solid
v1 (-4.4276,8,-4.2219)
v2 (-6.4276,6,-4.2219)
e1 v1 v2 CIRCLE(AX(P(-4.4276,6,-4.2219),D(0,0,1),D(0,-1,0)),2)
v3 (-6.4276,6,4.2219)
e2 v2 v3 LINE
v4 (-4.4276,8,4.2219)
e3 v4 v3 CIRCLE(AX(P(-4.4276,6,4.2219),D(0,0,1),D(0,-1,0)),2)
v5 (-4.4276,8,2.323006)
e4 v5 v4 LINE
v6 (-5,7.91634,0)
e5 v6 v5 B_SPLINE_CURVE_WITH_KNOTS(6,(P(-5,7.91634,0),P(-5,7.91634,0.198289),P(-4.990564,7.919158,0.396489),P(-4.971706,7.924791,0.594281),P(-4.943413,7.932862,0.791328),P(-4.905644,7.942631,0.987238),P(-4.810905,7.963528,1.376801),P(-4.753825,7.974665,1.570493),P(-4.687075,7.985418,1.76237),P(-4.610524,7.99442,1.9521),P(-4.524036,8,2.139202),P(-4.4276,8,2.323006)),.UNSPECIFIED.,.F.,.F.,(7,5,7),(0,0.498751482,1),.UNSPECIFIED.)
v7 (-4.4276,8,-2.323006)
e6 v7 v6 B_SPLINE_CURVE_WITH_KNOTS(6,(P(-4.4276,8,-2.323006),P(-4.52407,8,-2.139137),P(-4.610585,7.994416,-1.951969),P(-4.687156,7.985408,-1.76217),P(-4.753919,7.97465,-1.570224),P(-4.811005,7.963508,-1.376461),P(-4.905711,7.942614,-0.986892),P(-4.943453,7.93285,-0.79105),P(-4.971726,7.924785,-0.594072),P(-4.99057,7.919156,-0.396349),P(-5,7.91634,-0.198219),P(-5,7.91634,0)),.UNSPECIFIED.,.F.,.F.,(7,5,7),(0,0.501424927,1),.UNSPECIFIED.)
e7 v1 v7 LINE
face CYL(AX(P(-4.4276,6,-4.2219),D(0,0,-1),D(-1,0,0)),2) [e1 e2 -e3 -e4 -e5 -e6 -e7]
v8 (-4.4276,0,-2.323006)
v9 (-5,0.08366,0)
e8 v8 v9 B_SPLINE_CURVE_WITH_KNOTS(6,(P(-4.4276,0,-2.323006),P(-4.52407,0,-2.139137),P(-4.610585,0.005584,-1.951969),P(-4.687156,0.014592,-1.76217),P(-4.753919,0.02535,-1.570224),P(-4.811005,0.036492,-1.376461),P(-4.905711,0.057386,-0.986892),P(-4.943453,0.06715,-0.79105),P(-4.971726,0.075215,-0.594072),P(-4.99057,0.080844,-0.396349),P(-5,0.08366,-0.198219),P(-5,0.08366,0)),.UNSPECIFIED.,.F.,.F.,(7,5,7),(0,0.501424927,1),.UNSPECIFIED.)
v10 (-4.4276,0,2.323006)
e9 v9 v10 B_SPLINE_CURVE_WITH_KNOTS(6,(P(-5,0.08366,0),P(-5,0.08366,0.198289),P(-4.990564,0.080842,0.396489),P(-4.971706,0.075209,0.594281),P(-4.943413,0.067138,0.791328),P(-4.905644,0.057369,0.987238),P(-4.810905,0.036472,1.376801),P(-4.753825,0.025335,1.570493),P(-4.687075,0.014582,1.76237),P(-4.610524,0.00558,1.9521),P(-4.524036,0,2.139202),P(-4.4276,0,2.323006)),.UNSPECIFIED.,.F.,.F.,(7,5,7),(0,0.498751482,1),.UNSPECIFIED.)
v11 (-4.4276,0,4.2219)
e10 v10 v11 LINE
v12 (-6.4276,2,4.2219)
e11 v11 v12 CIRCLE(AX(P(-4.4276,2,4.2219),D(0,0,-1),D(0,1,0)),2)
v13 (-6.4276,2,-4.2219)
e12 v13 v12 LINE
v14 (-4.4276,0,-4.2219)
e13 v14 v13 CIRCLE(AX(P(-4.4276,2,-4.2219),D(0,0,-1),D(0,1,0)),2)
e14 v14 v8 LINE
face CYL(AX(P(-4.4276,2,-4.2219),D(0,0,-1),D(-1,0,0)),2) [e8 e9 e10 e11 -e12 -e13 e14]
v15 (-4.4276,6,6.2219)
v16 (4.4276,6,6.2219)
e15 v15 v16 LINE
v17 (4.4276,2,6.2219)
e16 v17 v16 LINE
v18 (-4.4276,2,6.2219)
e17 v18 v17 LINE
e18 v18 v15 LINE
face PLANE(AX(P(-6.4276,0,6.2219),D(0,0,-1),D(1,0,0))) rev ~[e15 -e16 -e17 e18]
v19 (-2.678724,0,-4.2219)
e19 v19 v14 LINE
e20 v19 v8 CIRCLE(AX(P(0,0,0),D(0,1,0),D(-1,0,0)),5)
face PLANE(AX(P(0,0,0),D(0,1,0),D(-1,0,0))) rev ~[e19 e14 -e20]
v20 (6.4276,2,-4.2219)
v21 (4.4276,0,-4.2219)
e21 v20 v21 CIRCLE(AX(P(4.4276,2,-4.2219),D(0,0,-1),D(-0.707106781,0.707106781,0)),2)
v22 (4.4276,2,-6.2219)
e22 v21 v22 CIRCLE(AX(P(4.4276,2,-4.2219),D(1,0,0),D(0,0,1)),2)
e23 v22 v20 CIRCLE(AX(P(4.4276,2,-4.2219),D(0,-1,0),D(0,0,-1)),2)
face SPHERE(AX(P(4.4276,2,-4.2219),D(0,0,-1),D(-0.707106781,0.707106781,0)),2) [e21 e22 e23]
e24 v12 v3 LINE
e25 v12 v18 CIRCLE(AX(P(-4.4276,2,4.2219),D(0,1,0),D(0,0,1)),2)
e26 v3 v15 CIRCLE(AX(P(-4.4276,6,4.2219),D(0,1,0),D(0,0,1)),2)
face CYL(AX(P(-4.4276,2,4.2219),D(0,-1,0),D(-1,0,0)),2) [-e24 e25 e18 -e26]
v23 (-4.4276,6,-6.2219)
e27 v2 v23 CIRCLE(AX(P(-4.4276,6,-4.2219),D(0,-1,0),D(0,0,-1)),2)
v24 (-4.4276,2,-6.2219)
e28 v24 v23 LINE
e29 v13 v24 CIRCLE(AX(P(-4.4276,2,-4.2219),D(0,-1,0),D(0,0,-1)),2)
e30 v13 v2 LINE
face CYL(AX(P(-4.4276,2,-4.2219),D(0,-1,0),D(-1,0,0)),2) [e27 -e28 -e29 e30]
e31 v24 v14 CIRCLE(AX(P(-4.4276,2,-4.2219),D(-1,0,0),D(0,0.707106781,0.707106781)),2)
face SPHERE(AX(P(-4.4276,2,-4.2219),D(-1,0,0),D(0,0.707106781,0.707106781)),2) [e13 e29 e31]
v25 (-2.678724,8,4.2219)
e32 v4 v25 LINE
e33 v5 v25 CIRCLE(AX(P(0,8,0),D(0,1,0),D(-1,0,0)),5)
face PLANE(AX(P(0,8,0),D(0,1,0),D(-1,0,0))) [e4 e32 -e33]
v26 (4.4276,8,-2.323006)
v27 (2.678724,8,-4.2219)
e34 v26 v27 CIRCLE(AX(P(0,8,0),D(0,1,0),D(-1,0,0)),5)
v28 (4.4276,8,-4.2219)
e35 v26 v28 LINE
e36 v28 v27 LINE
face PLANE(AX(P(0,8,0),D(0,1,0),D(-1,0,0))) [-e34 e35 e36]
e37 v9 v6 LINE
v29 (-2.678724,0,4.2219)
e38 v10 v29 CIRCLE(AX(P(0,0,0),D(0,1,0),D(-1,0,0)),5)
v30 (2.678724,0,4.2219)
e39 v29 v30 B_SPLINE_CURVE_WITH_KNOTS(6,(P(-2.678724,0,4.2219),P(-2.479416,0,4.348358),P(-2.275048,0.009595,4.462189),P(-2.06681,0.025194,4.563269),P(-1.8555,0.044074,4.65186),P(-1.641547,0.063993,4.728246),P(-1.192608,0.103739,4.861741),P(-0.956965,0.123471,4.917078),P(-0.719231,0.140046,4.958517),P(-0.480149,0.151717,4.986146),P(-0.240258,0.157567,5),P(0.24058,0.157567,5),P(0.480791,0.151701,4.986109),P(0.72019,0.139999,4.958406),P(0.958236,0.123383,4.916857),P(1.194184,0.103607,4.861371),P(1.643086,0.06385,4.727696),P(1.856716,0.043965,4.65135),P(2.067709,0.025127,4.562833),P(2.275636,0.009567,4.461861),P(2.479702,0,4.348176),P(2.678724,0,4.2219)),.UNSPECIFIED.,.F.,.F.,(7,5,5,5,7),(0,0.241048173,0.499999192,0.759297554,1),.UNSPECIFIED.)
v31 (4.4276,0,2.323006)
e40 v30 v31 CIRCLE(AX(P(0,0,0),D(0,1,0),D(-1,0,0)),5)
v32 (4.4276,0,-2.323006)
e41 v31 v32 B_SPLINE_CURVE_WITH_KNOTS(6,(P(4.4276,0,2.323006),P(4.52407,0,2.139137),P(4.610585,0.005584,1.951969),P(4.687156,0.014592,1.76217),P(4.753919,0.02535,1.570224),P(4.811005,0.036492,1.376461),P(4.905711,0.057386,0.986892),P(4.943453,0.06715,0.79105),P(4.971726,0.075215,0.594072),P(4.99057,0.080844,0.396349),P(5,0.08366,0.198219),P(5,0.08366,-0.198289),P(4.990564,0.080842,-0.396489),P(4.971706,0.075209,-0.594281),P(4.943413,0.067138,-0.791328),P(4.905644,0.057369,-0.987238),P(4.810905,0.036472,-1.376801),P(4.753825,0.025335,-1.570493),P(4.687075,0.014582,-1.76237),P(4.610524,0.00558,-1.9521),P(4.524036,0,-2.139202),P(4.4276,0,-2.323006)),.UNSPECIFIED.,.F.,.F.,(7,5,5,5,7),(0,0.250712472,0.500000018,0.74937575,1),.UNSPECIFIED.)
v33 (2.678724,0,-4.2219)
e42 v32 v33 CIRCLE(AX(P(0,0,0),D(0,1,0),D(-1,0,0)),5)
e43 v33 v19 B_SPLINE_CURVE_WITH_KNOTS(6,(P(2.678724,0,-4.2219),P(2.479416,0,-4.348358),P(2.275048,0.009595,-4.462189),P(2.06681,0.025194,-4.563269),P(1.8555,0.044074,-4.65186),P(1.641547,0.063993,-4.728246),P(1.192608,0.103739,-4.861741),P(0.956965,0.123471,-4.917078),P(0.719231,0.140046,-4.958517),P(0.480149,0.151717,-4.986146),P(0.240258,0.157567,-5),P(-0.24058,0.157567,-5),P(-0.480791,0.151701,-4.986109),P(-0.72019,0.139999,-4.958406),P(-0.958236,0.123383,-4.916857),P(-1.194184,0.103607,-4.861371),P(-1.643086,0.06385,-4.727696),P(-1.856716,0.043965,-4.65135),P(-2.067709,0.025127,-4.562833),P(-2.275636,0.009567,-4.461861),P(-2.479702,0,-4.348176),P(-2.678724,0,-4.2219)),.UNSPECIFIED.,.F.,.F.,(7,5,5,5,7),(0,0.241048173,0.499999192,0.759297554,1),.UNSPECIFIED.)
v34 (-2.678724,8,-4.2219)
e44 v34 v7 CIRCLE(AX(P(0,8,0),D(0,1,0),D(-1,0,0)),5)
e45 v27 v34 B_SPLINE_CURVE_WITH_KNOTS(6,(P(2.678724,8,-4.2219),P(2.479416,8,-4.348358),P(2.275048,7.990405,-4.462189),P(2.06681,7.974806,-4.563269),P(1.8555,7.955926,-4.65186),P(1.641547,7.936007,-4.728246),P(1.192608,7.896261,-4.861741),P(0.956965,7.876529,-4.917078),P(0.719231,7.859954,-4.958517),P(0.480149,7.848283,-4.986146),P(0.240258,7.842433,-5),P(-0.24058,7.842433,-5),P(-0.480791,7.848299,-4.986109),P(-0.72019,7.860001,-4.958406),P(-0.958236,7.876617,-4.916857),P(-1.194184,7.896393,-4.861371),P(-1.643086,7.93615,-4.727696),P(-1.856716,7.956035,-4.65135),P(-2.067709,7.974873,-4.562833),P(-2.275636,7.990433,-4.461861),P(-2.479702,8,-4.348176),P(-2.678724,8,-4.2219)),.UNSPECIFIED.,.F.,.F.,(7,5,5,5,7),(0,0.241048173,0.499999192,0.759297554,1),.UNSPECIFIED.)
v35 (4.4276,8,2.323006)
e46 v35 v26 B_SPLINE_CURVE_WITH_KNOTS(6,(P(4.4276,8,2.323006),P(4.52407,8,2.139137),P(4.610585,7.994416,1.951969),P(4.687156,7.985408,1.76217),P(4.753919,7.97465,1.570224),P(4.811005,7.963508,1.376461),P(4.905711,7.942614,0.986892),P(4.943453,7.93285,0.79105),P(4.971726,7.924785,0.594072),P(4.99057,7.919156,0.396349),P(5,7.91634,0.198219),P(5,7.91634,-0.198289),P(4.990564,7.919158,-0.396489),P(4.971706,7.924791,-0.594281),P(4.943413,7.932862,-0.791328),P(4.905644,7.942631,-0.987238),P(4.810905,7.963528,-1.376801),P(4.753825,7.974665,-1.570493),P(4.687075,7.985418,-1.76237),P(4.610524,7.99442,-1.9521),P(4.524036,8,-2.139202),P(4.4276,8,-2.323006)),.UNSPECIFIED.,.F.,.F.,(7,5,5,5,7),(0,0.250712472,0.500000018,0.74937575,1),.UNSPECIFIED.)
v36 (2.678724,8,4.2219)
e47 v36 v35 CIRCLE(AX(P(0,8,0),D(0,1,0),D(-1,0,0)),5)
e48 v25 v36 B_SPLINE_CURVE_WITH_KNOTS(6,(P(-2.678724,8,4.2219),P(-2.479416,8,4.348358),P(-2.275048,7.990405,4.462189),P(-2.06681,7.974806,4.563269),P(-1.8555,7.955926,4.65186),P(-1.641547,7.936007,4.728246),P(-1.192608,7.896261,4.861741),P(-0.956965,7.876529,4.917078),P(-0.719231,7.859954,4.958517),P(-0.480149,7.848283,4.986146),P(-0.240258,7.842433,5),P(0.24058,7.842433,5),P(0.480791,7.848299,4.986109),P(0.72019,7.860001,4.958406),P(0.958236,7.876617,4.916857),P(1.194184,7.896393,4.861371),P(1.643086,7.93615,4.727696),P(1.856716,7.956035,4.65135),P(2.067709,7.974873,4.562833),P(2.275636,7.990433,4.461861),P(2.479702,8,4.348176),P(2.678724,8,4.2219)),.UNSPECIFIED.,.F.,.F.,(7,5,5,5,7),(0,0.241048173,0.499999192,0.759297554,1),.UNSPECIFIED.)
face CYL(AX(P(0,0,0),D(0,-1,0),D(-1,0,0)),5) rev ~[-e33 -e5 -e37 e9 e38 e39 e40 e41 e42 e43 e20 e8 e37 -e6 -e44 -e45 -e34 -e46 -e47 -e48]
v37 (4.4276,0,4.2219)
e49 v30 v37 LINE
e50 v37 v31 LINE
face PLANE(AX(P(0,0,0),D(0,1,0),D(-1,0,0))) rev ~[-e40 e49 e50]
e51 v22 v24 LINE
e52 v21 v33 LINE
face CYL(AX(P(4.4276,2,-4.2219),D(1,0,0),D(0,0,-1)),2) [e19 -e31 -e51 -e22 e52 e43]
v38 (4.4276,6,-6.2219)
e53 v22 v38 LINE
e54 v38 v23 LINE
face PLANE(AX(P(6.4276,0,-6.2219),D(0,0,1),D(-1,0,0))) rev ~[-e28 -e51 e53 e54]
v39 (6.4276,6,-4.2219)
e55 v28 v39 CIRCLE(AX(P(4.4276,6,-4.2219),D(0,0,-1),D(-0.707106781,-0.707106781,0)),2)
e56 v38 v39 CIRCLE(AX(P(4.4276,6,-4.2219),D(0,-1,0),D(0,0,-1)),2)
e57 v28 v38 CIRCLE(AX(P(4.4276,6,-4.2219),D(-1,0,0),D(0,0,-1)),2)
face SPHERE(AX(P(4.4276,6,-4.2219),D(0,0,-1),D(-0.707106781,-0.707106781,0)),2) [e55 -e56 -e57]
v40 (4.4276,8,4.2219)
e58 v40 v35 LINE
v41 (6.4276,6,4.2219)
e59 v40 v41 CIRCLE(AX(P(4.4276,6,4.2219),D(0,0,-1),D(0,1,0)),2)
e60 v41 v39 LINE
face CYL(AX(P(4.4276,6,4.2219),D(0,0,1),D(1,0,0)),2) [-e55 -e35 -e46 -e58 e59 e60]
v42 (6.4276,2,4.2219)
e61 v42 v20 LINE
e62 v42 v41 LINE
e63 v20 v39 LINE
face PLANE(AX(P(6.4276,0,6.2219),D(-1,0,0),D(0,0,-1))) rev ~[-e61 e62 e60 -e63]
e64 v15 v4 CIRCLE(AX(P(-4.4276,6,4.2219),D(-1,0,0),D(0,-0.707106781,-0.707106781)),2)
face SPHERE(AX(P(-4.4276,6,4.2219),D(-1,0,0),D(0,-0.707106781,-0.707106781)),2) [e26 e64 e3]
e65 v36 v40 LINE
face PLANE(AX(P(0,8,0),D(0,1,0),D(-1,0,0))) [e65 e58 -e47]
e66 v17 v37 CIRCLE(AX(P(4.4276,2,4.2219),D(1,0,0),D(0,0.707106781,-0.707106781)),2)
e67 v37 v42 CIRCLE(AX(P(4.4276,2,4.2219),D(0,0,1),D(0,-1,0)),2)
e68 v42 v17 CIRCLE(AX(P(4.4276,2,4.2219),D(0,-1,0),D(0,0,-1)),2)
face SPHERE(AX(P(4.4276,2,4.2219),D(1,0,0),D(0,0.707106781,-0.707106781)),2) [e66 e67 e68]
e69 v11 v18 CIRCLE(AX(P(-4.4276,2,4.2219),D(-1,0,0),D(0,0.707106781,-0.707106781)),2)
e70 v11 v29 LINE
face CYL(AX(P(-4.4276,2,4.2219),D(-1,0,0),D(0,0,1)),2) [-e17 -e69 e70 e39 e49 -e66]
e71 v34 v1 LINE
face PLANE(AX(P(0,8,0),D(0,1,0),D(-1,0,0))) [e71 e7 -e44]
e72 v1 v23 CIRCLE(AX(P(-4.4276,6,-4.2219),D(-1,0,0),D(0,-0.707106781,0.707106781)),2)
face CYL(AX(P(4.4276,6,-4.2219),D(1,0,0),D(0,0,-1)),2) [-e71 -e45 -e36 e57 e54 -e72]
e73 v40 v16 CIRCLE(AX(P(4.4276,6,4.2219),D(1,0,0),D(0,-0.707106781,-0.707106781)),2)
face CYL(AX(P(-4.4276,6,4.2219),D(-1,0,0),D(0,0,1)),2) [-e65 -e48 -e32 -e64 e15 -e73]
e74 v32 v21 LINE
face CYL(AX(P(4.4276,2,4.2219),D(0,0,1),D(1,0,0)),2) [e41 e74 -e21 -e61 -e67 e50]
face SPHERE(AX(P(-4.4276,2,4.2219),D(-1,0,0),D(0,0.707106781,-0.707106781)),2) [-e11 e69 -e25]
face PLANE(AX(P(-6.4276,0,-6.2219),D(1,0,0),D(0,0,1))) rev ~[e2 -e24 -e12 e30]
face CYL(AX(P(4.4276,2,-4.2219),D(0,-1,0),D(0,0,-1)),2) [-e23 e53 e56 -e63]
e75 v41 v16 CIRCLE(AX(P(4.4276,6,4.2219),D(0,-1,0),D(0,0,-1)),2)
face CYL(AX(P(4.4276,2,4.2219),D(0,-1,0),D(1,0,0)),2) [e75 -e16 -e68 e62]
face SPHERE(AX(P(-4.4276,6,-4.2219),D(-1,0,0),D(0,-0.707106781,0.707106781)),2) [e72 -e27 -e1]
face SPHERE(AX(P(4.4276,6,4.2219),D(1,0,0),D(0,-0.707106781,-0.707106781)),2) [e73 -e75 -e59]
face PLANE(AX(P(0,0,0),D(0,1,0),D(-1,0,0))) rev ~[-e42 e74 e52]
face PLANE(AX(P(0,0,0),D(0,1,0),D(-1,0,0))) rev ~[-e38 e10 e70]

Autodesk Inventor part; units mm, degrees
ref_plane "YZ Plane" through (0, 0, 0) normal (1, 0, 0) x (0, 1, 0)
ref_plane "XZ Plane" through (0, 0, 0) normal (0, 1, 0) x (-1, 0, 0)
ref_plane "XY Plane" through (0, 0, 0) normal (0, 0, 1) x (1, 0, 0)
sketch "Sketch1" plane through (0, 0, 0) normal (0, 1, 0) x (-1, 0, 0)
  circle A0 centre (0, 0) radius 5
  line L0 (6.4276, 6.2219) -> (-6.4276, 6.2219)
  line L1 (-6.4276, 6.2219) -> (-6.4276, -6.2219)
  line L2 (-6.4276, -6.2219) -> (6.4276, -6.2219)
  line L3 (6.4276, -6.2219) -> (6.4276, 6.2219)
  line L4 (6.4276, 6.2219) -> (-6.4276, -6.2219) construction
  line L5 (-6.4276, 6.2219) -> (6.4276, -6.2219) construction
  dimension "d0" = 10
extrude "Extrusion1" add sketch "Sketch1" along normal blind 8
fillet "Fillet1" radius 2 12 edges at (6.4276, 8, 0) (0, 8, -6.2219) (0, 8, 6.2219) (-6.4276, 8, 0) (-6.4276, 0, 0) (0, 0, 6.2219) (6.4276, 0, 0) (0, 0, -6.2219) (-6.4276, 4, -6.2219) (6.4276, 4, 6.2219) (6.4276, 4, -6.2219) (-6.4276, 4, 6.2219)
thread "Thread1" size "M10x1" class "6H" standard "ANSI Metric M Profile" full length
properties part number "benzcadnut"
